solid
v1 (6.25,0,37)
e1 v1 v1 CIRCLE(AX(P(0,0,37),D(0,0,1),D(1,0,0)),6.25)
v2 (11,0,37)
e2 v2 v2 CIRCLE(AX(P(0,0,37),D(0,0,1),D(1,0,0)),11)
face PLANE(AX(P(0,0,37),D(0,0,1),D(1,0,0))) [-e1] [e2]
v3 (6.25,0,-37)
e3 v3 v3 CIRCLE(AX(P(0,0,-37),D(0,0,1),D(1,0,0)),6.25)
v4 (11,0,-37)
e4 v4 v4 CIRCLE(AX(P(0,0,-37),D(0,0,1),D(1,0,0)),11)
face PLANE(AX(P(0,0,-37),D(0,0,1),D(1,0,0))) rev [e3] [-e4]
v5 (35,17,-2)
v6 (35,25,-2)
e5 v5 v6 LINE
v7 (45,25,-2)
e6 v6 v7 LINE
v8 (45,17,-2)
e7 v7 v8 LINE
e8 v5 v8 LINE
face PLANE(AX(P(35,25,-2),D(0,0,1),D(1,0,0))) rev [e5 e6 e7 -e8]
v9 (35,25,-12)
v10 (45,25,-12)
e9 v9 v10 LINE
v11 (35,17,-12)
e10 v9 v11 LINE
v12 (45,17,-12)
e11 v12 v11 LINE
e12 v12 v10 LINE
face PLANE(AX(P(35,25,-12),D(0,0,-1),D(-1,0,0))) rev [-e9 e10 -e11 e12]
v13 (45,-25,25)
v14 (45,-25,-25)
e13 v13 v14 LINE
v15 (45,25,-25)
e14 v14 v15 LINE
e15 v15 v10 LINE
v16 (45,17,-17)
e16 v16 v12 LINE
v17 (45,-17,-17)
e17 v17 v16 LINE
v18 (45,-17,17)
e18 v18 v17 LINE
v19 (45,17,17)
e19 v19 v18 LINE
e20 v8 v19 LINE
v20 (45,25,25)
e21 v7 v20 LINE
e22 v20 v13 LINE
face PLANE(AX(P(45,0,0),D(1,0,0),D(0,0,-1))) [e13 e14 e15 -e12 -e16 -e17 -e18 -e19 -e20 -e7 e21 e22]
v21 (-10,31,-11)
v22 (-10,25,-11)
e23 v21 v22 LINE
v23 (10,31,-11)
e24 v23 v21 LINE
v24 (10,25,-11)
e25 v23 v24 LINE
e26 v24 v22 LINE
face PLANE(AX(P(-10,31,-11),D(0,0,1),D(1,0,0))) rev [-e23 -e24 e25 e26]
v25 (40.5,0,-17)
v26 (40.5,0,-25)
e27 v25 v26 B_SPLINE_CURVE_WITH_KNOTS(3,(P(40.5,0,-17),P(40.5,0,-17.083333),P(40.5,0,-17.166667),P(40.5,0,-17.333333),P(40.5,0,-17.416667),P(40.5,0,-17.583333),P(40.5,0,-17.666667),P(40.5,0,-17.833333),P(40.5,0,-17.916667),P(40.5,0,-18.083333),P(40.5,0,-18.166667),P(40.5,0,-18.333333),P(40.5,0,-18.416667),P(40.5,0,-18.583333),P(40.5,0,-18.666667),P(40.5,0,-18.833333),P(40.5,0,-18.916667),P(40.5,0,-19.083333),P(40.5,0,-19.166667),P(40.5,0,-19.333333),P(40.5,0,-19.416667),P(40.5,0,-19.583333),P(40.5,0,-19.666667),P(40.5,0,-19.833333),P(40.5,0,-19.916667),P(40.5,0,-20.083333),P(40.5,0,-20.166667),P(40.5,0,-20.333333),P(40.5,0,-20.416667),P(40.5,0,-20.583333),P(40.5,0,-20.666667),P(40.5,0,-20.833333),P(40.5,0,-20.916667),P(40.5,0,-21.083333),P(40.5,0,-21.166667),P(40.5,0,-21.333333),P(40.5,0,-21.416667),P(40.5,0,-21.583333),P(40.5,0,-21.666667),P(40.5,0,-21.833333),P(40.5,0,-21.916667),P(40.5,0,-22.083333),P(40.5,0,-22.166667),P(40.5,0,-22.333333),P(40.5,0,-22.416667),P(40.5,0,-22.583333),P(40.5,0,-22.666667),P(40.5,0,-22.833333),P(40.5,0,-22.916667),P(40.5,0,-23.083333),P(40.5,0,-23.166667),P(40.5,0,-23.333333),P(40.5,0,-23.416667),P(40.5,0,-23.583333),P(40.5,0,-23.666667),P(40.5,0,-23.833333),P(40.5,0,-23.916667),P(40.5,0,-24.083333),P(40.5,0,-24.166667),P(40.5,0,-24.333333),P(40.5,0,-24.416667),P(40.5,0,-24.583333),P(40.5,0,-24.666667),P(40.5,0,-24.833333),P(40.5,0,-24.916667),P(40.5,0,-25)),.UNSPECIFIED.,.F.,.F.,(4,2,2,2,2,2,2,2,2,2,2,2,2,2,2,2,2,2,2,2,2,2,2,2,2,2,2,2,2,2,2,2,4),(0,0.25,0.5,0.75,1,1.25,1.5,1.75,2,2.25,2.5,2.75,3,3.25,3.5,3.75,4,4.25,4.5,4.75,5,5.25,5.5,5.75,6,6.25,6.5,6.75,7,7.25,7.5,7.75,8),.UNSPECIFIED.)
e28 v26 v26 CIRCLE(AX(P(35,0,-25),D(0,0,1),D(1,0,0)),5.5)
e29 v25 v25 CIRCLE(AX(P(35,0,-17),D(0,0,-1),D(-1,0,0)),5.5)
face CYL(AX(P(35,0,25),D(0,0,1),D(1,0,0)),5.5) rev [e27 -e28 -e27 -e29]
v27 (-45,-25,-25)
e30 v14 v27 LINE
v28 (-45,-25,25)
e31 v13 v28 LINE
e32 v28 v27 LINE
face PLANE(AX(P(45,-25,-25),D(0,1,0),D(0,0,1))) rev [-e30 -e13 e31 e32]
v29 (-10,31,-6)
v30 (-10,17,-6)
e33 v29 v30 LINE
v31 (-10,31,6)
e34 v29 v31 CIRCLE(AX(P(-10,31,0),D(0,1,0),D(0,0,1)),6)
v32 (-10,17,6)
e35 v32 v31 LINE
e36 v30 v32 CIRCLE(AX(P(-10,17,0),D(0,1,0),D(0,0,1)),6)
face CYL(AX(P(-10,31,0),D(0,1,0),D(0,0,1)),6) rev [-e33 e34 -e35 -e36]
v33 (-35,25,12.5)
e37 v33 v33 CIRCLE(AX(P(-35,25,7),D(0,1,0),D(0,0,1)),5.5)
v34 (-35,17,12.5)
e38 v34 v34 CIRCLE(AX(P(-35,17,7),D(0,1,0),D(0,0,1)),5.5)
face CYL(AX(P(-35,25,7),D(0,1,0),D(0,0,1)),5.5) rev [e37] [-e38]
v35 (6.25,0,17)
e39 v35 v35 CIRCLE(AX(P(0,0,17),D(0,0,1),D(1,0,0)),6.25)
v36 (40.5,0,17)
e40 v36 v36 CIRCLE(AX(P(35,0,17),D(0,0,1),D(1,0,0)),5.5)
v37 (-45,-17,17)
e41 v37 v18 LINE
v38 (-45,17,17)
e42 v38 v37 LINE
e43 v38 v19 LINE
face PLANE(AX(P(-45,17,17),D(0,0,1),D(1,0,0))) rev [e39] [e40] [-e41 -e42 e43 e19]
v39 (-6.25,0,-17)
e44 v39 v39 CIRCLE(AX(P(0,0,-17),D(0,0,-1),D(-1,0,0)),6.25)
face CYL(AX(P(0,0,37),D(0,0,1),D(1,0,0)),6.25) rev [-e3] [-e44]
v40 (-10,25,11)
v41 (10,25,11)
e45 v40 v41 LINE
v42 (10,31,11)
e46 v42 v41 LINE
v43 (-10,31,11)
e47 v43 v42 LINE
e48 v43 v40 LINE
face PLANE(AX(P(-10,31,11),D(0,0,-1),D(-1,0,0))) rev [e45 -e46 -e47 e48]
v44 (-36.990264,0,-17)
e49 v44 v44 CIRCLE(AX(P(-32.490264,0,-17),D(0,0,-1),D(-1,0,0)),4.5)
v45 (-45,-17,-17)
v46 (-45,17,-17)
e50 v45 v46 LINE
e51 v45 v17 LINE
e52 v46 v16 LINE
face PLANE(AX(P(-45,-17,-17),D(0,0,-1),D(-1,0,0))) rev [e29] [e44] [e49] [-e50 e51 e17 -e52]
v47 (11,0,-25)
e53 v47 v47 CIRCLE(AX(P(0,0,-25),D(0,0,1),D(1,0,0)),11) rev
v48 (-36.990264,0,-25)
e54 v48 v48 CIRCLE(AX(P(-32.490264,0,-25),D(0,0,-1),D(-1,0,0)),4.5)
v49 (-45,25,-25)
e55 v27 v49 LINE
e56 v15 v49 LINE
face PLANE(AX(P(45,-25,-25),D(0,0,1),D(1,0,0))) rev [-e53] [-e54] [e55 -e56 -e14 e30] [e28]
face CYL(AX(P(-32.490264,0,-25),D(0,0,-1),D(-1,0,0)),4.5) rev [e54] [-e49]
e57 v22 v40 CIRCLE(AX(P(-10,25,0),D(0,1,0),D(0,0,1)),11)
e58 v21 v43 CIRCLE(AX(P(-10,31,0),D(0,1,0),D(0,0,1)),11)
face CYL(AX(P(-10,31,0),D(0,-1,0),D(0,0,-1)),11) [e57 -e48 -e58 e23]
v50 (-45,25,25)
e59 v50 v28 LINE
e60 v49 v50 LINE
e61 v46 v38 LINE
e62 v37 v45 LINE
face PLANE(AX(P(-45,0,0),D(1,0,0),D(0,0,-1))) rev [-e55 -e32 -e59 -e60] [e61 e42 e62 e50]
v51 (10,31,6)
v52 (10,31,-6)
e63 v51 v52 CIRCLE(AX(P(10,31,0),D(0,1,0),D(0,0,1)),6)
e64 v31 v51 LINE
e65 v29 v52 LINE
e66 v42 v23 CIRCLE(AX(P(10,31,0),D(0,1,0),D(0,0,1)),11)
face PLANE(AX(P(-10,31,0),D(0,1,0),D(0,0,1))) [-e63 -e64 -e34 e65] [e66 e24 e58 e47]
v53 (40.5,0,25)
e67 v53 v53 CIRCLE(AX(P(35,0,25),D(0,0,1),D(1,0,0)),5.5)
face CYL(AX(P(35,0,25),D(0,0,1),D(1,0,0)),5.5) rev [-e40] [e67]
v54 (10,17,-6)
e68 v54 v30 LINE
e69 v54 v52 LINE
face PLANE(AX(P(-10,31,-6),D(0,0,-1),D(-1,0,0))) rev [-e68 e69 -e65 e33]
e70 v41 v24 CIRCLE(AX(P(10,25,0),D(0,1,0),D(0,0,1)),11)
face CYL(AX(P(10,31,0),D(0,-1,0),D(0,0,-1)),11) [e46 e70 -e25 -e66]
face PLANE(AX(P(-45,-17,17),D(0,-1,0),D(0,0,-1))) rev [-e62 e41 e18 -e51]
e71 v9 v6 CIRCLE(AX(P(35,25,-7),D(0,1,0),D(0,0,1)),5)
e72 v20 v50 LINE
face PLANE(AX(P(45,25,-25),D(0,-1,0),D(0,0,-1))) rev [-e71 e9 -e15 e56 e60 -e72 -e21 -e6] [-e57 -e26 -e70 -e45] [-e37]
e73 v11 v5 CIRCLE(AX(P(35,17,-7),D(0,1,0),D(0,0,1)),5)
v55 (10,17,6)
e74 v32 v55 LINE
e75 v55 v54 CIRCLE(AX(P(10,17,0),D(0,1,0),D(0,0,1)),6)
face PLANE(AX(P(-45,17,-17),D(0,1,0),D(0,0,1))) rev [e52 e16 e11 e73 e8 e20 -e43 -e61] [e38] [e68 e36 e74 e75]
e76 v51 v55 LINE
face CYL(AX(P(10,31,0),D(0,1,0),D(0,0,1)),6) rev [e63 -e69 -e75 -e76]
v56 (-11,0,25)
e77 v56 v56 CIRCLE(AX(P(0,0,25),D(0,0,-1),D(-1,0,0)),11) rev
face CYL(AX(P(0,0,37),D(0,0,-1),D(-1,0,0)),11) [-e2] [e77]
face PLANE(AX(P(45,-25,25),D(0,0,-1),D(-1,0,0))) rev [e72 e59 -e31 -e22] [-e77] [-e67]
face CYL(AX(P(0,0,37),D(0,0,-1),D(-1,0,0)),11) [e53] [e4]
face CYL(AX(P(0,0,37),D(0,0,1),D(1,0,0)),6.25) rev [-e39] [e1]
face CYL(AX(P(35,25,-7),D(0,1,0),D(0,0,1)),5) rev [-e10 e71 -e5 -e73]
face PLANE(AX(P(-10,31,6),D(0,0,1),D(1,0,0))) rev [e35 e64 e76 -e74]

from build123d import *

# Parameters (mm, degrees)
SKETCH1_W                      = 50
SKETCH1_H                      = 50
BOSS_EXTRUDE1_DEPTH            = 45
SKETCH3_R                      = 11
BOSS_EXTRUDE2_DEPTH            = 37
BOSS_EXTRUDE3_DEPTH            = 6
SKETCH5_W                      = 34
SKETCH5_H                      = 34
CUT_EXTRUDE1_DEPTH             = 103.127371453
F_12_5_12_5_DIAMETER_HOLE1_D   = 12.5
F_12_0_START                   = 17
F_12_0_12_DIAMETER_SLOT2_DEPTH = 14
F_10_0_START                   = 17
F_10_0_10_DIAMETER_SLOT1_DEPTH = 8
M10_CLEARANCE_HOLE1_D          = 11
M10_CLEARANCE_HOLE1_DEPTH      = 8
M10_CLEARANCE_HOLE2_D          = 11
M10X1_0_TAPPED_HOLE1_D         = 9
M10X1_0_TAPPED_HOLE1_DEPTH     = 8


# Read off the part's stored shape, not the designer's step: Ø12.0 (12) Diameter Slot2, Ø10.0 (10) Diameter Slot1
with BuildPart() as part:
    # Sketch1 → Boss-Extrude1 (new, symmetric)
    with BuildSketch(Plane(origin=(0, 0, 0), x_dir=(0, 0, -1), z_dir=(1, 0, 0))):
        Rectangle(SKETCH1_W, SKETCH1_H)
    extrude(amount=BOSS_EXTRUDE1_DEPTH, both=True)

    # Sketch3 → Boss-Extrude2 (add, symmetric)
    with BuildSketch(Plane.XY):
        Circle(SKETCH3_R)
    extrude(amount=BOSS_EXTRUDE2_DEPTH, both=True)

    # Sketch4 → Boss-Extrude3 (add)
    with BuildSketch(Plane(origin=(0, 25, 0), x_dir=(1, 0, 0), z_dir=(0, 1, 0))):
        with BuildLine():
            Line((-10, 11), (10, 11))
            ThreePointArc((10, 11), (21, 0), (10, -11))
            Line((10, -11), (-10, -11))
            ThreePointArc((-10, -11), (-21, 0), (-10, 11))
        make_face()
    extrude(amount=BOSS_EXTRUDE3_DEPTH)

    # Sketch5 → Cut-Extrude1 (cut, through all)
    with BuildSketch(Plane(origin=(45, 0, 0), x_dir=(0, 0, -1), z_dir=(1, 0, 0))):
        Rectangle(SKETCH5_W, SKETCH5_H)
    extrude(amount=-CUT_EXTRUDE1_DEPTH, mode=Mode.SUBTRACT)

    # Ø12.5 (12.5) Diameter Hole1 (through all)
    with Locations(Plane.XY.offset(37)):
        with Locations((0, 0)):
            Hole(F_12_5_12_5_DIAMETER_HOLE1_D / 2)

    # Ø12.0 (12) Diameter Slot2 outline → Ø12.0 (12) Diameter Slot2 (cut)
    with BuildSketch(Plane(origin=(0, 0, 0), x_dir=(1, 0, 0), z_dir=(0, 1, 0)).offset(F_12_0_START)):
        with BuildLine():
            Line((-10, -6), (10, -6))
            ThreePointArc((10, -6), (16, 0), (10, 6))
            Line((10, 6), (-10, 6))
            ThreePointArc((-10, 6), (-16, 0), (-10, -6))
        make_face()
    extrude(amount=F_12_0_12_DIAMETER_SLOT2_DEPTH, mode=Mode.SUBTRACT)

    # Ø10.0 (10) Diameter Slot1 outline → Ø10.0 (10) Diameter Slot1 (cut)
    with BuildSketch(Plane(origin=(0, 0, 0), x_dir=(1, 0, 0), z_dir=(0, 1, 0)).offset(F_10_0_START)):
        with BuildLine():
            ThreePointArc((35, 12), (30, 7), (35, 2))
            Line((35, 2), (45, 2))
            Line((45, 2), (45, 12))
            Line((45, 12), (35, 12))
        make_face()
    extrude(amount=F_10_0_10_DIAMETER_SLOT1_DEPTH, mode=Mode.SUBTRACT)

    # M10 Clearance Hole1
    with Locations(Plane(origin=(0, 25, 0), x_dir=(1, 0, 0), z_dir=(0, 1, 0))):
        with Locations((-35, -7)):
            Hole(M10_CLEARANCE_HOLE1_D / 2, depth=M10_CLEARANCE_HOLE1_DEPTH)

    # M10 Clearance Hole2 (through all)
    with Locations(Plane(origin=(35, 0, 25), x_dir=(1, 0, 0), z_dir=(0, 0, 1))):
        with Locations((0, 0)):
            Hole(M10_CLEARANCE_HOLE2_D / 2)

    # M10x1.0 Tapped Hole1
    with Locations(Plane(origin=(0, 0, -25), x_dir=(-1, 0, 0), z_dir=(0, 0, -1))):
        with Locations((32.490263529, 0)):
            Hole(M10X1_0_TAPPED_HOLE1_D / 2, depth=M10X1_0_TAPPED_HOLE1_DEPTH)


solid = part.part
